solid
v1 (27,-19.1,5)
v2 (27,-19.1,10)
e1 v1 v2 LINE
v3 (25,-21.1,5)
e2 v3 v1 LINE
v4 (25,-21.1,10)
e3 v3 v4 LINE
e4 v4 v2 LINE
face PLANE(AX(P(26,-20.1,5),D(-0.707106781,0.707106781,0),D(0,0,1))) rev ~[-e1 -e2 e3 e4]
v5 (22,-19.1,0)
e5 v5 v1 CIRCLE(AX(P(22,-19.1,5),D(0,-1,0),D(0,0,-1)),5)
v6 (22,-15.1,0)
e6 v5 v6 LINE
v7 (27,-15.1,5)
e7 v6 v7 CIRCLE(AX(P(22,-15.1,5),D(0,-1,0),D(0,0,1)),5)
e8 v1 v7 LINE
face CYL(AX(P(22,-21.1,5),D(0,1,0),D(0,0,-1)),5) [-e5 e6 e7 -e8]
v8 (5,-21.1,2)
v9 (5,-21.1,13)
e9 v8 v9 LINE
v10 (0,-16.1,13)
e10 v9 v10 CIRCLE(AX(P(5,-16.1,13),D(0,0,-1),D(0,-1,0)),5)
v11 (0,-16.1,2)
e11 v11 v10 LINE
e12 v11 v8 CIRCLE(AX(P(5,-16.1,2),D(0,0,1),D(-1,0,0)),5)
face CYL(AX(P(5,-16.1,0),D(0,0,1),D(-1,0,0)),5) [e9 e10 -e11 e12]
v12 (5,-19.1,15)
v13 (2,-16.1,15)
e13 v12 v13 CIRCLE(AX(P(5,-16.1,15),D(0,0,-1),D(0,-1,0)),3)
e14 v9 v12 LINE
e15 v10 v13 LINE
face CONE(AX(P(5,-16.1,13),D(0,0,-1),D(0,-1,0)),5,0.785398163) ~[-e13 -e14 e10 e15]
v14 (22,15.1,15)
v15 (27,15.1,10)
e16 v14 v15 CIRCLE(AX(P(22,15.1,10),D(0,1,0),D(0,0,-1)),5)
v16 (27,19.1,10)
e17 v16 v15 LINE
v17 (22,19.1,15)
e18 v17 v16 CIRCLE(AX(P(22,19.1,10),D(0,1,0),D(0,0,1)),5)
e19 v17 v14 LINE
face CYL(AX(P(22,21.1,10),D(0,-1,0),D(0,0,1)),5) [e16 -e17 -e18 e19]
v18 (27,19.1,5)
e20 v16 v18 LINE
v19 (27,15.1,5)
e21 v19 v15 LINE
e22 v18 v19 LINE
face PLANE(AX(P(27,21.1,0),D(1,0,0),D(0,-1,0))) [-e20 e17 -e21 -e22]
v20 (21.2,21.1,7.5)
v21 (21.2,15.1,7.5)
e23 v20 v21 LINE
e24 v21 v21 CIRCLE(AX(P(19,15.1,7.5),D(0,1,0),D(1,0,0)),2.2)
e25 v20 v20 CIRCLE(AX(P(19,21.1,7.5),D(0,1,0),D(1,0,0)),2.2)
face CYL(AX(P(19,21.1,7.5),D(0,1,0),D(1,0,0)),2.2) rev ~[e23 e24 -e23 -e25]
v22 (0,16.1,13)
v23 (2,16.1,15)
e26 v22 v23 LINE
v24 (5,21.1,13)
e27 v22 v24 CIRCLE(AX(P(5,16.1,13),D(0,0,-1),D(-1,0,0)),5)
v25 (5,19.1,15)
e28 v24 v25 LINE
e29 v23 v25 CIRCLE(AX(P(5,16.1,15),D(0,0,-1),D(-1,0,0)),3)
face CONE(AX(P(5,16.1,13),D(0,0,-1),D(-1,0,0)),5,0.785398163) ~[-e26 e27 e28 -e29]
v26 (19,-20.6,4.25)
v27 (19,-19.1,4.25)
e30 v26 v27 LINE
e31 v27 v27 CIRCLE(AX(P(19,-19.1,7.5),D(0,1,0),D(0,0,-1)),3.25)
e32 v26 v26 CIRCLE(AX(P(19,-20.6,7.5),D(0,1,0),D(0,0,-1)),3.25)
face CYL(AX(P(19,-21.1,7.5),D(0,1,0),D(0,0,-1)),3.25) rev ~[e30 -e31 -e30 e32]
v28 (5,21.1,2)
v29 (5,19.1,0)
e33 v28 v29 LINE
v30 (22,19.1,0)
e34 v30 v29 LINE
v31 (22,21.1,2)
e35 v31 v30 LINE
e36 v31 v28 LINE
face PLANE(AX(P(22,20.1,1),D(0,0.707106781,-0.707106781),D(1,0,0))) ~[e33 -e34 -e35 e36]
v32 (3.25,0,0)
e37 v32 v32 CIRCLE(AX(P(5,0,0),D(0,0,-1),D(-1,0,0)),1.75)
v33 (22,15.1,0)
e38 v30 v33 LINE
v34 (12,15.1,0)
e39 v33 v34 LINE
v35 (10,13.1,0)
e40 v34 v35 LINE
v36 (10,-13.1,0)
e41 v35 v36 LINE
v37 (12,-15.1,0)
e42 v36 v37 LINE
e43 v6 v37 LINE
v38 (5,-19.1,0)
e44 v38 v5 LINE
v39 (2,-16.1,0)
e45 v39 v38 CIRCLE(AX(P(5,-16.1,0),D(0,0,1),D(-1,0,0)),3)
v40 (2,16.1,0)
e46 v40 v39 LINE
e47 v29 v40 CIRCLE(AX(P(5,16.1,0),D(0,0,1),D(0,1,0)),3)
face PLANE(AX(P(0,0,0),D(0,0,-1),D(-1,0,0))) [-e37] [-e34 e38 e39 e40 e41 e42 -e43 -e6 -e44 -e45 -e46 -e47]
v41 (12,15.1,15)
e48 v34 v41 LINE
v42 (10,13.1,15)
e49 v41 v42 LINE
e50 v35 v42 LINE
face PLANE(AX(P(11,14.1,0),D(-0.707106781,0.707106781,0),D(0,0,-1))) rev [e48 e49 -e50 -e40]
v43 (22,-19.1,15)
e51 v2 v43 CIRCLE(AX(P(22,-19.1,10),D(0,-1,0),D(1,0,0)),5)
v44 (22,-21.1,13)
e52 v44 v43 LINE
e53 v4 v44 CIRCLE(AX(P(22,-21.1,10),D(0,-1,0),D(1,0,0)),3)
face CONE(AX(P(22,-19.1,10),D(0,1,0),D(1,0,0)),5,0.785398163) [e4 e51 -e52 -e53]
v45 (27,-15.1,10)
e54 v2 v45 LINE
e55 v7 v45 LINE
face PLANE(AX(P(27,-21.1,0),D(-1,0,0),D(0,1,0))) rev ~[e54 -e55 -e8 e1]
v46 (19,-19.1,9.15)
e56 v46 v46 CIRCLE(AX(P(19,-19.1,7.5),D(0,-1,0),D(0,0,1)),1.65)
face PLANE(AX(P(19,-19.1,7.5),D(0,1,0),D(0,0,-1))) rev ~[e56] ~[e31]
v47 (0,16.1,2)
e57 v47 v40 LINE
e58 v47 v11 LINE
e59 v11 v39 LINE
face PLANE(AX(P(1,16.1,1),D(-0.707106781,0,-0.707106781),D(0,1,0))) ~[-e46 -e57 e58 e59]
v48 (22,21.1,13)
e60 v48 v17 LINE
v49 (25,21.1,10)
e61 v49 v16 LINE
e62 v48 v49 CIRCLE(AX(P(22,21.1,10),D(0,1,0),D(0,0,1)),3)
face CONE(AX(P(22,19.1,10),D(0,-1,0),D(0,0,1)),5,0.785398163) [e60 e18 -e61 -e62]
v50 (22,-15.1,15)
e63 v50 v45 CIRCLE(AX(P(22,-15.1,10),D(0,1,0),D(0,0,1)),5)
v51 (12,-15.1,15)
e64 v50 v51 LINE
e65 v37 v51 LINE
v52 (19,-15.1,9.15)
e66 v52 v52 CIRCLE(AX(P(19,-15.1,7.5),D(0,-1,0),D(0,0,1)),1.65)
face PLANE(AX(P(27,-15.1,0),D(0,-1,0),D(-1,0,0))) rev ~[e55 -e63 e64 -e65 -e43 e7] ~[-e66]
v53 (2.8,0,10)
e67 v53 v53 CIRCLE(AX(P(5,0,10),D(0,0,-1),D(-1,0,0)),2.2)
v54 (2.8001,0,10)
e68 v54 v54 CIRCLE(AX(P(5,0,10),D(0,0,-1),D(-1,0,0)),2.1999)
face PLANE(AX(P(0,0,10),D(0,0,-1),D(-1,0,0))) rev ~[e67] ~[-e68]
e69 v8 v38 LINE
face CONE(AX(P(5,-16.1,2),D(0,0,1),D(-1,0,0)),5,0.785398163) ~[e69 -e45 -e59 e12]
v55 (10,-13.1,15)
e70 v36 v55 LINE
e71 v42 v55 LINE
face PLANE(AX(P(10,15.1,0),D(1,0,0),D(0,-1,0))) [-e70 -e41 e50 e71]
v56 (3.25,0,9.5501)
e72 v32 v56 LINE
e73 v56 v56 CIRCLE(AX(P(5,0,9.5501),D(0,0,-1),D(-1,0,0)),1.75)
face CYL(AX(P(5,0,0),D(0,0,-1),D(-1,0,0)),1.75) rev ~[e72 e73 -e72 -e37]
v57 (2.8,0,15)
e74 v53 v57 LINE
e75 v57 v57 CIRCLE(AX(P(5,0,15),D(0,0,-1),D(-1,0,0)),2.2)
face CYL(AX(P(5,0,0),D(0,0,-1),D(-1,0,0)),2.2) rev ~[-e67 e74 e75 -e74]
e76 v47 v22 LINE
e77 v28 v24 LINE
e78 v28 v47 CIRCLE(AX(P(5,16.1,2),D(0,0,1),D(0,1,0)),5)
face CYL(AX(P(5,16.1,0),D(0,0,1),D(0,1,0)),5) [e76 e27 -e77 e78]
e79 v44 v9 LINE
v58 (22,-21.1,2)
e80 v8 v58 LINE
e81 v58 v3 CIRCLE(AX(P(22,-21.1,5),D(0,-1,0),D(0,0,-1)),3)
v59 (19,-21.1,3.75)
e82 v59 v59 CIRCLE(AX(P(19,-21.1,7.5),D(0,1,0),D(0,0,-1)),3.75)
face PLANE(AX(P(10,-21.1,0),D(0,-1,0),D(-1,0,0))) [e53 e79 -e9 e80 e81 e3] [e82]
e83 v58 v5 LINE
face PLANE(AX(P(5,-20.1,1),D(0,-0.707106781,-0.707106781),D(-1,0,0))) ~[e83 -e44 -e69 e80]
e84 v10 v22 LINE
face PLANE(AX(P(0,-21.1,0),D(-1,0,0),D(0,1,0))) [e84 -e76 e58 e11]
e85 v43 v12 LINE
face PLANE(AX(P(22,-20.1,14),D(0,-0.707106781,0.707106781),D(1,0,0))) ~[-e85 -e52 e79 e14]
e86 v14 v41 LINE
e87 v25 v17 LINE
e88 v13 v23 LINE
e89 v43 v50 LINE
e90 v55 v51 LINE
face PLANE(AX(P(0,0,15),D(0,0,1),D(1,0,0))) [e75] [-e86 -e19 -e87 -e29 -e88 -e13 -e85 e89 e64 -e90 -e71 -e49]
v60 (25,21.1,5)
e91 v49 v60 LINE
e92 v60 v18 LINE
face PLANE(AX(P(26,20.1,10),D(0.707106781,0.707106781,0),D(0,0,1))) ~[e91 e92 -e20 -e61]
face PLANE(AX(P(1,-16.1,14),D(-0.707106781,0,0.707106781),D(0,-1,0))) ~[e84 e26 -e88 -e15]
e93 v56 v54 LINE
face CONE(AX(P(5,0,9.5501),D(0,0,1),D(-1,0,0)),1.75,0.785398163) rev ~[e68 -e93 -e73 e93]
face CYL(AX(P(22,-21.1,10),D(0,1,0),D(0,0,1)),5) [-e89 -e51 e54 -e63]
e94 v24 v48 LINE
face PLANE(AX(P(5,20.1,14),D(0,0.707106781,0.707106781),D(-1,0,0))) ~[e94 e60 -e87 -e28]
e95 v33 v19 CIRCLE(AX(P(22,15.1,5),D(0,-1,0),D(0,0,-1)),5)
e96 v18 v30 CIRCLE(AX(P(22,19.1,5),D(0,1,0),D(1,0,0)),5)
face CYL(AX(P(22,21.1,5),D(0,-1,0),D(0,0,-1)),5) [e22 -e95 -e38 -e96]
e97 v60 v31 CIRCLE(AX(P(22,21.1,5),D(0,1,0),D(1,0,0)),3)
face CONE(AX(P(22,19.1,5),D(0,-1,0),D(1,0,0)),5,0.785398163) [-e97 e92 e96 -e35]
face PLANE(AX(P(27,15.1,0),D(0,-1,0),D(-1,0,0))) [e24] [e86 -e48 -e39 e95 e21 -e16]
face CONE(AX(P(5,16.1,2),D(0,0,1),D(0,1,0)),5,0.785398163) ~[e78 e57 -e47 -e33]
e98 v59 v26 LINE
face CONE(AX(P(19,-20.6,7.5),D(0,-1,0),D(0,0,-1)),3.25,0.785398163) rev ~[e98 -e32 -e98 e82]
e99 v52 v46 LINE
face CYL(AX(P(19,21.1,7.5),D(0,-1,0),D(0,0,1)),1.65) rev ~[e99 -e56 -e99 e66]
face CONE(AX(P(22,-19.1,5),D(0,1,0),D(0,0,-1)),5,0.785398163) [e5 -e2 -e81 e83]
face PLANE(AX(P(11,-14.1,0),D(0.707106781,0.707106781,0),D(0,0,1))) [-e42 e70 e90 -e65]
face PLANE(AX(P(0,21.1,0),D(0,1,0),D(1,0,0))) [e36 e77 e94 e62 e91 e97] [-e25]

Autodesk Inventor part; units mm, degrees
ref_plane "YZ Plane" through (0, 0, 0) normal (1, 0, 0) x (0, 1, 0)
ref_plane "XZ Plane" through (0, 0, 0) normal (0, 1, 0) x (-1, 0, 0)
ref_plane "XY Plane" through (0, 0, 0) normal (0, 0, 1) x (1, 0, 0)
sketch "スケッチ1" plane through (0, 0, 0) normal (0, 0, 1) x (1, 0, 0)
  line L0 (0, 21.1) -> (10, 21.1)
  line L1 (10, 21.1) -> (10, -21.1)
  line L2 (10, -21.1) -> (0, -21.1)
  line L3 (0, -21.1) -> (0, 21.1)
  line L4 (10, 21.1) -> (27, 21.1)
  line L5 (27, 21.1) -> (27, 15.1)
  line L6 (27, 15.1) -> (10, 15.1)
  line L7 (10, 15.1) -> (10, 21.1)
  line L8 (10, -21.1) -> (27, -21.1)
  line L9 (27, -21.1) -> (27, -15.1)
  line L10 (27, -15.1) -> (10, -15.1)
  line L11 (10, -15.1) -> (10, -21.1)
  point P0 (0, 0)
  point P1 (19, 15.1)
  point P2 (10, 15.1)
  dimension "d3" = 8
  dimension "d4" = 10
  dimension "d5" = 30.2
  dimension "d7" = 9
  dimension "d22" = 15.1
  dimension "d25" = 6
  dimension "d26" = 6
extrude "押し出し1" add sketch "スケッチ1" along normal blind 15
sketch "スケッチ2" plane through (0, 21.1, 0) normal (0, 1, 0) x (1, 0, 0)
  line L0 (27, -15) -> (0, -15) projected
  line L1 (27, 0) -> (27, -15) projected
  line L2 (27, 0) -> (10, 0) projected
  line L3 (10, 0) -> (10, -15) projected
  line L4 (27, -15) -> (10, -15) projected
  line L5 (27, 0) -> (27, -15) projected
  point P0 (19, -7.5)
  dimension "d10" = 8
  dimension "d11" = 7.5
hole "穴1" at (19, 21.1, 7.5) direction (0, -1, 0) diameter 3.3 depth 58
sketch "スケッチ3" plane through (0, 21.1, 0) normal (0, 1, 0) x (1, 0, 0)
  circle A0 centre (19, -7.5) radius 1.65 projected
  circle A1 centre (19, -7.5) radius 2.2
  dimension "d19" = 4.4
extrude "押し出し2" cut sketch "スケッチ3" against normal blind 10 contours A0 | A1
fillet "フィレット2" radius 5 6 edges at (27, 18.1, 0) (27, -18.1, 0) (27, -18.1, 15) (27, 18.1, 15) (0, 21.1, 7.5) (0, -21.1, 7.5)
sketch "スケッチ7" plane through (0, 0, 0) normal (0, 0, -1) x (-1, 0, 0)
  circle A0 centre (-5, 0) radius 2.2
  point P0 (0, 0)
  dimension "d55" = 4.4
extrude "押し出し5" cut sketch "スケッチ7" against normal blind 21.25
sketch "スケッチ8" plane through (0, 0, 0) normal (0, 0, -1) x (-1, 0, 0)
  circle A0 centre (-5, 0) radius 2.2 projected
  circle A1 centre (-5, 0) radius 1.75
  point P0 (0, 0)
  dimension "d65" = 3.5
extrude "押し出し6" add sketch "スケッチ8" against normal blind 10
chamfer "面取り8" distance 0.45 angle 45 1 edges at (6.75, 0, 10)
chamfer "面取り9" distance 2 angle 45 16 edges at (13.5, 21.1, 15) (1.4645, 19.6355, 15) (0, 0, 15) (1.4645, -19.6355, 15) (13.5, -21.1, 15) (25.5355, -21.1, 13.5355) (27, -21.1, 7.5) (25.5355, -21.1, 1.4645) (13.5, -21.1, 0) (1.4645, -19.6355, 0) (0, 0, 0) (1.4645, 19.6355, 0) (13.5, 21.1, 0) (25.5355, 21.1, 1.4645) (27, 21.1, 7.5) (25.5355, 21.1, 13.5355)
chamfer "面取り10" distance 2 angle 45 2 edges at (10, -15.1, 7.5) (10, 15.1, 7.5)
sketch "スケッチ9" plane through (5, -21.1, 2) normal (0, -1, 0) x (1, 0, 0)
  circle A0 centre (14, 5.5) radius 1.65 projected
  point P0 (-5, -2)
hole "穴3" at (19, -21.1, 7.5) direction (0, 1, 0) diameter 6.5 depth 2
chamfer "面取り11" distance 0.5 angle 45 1 edges at (19, -21.1, 10.75)
equation "\"d22\" = 0.5 * d5"
properties part number "Print_Parts_I" material "PC/ABS プラスチック"
